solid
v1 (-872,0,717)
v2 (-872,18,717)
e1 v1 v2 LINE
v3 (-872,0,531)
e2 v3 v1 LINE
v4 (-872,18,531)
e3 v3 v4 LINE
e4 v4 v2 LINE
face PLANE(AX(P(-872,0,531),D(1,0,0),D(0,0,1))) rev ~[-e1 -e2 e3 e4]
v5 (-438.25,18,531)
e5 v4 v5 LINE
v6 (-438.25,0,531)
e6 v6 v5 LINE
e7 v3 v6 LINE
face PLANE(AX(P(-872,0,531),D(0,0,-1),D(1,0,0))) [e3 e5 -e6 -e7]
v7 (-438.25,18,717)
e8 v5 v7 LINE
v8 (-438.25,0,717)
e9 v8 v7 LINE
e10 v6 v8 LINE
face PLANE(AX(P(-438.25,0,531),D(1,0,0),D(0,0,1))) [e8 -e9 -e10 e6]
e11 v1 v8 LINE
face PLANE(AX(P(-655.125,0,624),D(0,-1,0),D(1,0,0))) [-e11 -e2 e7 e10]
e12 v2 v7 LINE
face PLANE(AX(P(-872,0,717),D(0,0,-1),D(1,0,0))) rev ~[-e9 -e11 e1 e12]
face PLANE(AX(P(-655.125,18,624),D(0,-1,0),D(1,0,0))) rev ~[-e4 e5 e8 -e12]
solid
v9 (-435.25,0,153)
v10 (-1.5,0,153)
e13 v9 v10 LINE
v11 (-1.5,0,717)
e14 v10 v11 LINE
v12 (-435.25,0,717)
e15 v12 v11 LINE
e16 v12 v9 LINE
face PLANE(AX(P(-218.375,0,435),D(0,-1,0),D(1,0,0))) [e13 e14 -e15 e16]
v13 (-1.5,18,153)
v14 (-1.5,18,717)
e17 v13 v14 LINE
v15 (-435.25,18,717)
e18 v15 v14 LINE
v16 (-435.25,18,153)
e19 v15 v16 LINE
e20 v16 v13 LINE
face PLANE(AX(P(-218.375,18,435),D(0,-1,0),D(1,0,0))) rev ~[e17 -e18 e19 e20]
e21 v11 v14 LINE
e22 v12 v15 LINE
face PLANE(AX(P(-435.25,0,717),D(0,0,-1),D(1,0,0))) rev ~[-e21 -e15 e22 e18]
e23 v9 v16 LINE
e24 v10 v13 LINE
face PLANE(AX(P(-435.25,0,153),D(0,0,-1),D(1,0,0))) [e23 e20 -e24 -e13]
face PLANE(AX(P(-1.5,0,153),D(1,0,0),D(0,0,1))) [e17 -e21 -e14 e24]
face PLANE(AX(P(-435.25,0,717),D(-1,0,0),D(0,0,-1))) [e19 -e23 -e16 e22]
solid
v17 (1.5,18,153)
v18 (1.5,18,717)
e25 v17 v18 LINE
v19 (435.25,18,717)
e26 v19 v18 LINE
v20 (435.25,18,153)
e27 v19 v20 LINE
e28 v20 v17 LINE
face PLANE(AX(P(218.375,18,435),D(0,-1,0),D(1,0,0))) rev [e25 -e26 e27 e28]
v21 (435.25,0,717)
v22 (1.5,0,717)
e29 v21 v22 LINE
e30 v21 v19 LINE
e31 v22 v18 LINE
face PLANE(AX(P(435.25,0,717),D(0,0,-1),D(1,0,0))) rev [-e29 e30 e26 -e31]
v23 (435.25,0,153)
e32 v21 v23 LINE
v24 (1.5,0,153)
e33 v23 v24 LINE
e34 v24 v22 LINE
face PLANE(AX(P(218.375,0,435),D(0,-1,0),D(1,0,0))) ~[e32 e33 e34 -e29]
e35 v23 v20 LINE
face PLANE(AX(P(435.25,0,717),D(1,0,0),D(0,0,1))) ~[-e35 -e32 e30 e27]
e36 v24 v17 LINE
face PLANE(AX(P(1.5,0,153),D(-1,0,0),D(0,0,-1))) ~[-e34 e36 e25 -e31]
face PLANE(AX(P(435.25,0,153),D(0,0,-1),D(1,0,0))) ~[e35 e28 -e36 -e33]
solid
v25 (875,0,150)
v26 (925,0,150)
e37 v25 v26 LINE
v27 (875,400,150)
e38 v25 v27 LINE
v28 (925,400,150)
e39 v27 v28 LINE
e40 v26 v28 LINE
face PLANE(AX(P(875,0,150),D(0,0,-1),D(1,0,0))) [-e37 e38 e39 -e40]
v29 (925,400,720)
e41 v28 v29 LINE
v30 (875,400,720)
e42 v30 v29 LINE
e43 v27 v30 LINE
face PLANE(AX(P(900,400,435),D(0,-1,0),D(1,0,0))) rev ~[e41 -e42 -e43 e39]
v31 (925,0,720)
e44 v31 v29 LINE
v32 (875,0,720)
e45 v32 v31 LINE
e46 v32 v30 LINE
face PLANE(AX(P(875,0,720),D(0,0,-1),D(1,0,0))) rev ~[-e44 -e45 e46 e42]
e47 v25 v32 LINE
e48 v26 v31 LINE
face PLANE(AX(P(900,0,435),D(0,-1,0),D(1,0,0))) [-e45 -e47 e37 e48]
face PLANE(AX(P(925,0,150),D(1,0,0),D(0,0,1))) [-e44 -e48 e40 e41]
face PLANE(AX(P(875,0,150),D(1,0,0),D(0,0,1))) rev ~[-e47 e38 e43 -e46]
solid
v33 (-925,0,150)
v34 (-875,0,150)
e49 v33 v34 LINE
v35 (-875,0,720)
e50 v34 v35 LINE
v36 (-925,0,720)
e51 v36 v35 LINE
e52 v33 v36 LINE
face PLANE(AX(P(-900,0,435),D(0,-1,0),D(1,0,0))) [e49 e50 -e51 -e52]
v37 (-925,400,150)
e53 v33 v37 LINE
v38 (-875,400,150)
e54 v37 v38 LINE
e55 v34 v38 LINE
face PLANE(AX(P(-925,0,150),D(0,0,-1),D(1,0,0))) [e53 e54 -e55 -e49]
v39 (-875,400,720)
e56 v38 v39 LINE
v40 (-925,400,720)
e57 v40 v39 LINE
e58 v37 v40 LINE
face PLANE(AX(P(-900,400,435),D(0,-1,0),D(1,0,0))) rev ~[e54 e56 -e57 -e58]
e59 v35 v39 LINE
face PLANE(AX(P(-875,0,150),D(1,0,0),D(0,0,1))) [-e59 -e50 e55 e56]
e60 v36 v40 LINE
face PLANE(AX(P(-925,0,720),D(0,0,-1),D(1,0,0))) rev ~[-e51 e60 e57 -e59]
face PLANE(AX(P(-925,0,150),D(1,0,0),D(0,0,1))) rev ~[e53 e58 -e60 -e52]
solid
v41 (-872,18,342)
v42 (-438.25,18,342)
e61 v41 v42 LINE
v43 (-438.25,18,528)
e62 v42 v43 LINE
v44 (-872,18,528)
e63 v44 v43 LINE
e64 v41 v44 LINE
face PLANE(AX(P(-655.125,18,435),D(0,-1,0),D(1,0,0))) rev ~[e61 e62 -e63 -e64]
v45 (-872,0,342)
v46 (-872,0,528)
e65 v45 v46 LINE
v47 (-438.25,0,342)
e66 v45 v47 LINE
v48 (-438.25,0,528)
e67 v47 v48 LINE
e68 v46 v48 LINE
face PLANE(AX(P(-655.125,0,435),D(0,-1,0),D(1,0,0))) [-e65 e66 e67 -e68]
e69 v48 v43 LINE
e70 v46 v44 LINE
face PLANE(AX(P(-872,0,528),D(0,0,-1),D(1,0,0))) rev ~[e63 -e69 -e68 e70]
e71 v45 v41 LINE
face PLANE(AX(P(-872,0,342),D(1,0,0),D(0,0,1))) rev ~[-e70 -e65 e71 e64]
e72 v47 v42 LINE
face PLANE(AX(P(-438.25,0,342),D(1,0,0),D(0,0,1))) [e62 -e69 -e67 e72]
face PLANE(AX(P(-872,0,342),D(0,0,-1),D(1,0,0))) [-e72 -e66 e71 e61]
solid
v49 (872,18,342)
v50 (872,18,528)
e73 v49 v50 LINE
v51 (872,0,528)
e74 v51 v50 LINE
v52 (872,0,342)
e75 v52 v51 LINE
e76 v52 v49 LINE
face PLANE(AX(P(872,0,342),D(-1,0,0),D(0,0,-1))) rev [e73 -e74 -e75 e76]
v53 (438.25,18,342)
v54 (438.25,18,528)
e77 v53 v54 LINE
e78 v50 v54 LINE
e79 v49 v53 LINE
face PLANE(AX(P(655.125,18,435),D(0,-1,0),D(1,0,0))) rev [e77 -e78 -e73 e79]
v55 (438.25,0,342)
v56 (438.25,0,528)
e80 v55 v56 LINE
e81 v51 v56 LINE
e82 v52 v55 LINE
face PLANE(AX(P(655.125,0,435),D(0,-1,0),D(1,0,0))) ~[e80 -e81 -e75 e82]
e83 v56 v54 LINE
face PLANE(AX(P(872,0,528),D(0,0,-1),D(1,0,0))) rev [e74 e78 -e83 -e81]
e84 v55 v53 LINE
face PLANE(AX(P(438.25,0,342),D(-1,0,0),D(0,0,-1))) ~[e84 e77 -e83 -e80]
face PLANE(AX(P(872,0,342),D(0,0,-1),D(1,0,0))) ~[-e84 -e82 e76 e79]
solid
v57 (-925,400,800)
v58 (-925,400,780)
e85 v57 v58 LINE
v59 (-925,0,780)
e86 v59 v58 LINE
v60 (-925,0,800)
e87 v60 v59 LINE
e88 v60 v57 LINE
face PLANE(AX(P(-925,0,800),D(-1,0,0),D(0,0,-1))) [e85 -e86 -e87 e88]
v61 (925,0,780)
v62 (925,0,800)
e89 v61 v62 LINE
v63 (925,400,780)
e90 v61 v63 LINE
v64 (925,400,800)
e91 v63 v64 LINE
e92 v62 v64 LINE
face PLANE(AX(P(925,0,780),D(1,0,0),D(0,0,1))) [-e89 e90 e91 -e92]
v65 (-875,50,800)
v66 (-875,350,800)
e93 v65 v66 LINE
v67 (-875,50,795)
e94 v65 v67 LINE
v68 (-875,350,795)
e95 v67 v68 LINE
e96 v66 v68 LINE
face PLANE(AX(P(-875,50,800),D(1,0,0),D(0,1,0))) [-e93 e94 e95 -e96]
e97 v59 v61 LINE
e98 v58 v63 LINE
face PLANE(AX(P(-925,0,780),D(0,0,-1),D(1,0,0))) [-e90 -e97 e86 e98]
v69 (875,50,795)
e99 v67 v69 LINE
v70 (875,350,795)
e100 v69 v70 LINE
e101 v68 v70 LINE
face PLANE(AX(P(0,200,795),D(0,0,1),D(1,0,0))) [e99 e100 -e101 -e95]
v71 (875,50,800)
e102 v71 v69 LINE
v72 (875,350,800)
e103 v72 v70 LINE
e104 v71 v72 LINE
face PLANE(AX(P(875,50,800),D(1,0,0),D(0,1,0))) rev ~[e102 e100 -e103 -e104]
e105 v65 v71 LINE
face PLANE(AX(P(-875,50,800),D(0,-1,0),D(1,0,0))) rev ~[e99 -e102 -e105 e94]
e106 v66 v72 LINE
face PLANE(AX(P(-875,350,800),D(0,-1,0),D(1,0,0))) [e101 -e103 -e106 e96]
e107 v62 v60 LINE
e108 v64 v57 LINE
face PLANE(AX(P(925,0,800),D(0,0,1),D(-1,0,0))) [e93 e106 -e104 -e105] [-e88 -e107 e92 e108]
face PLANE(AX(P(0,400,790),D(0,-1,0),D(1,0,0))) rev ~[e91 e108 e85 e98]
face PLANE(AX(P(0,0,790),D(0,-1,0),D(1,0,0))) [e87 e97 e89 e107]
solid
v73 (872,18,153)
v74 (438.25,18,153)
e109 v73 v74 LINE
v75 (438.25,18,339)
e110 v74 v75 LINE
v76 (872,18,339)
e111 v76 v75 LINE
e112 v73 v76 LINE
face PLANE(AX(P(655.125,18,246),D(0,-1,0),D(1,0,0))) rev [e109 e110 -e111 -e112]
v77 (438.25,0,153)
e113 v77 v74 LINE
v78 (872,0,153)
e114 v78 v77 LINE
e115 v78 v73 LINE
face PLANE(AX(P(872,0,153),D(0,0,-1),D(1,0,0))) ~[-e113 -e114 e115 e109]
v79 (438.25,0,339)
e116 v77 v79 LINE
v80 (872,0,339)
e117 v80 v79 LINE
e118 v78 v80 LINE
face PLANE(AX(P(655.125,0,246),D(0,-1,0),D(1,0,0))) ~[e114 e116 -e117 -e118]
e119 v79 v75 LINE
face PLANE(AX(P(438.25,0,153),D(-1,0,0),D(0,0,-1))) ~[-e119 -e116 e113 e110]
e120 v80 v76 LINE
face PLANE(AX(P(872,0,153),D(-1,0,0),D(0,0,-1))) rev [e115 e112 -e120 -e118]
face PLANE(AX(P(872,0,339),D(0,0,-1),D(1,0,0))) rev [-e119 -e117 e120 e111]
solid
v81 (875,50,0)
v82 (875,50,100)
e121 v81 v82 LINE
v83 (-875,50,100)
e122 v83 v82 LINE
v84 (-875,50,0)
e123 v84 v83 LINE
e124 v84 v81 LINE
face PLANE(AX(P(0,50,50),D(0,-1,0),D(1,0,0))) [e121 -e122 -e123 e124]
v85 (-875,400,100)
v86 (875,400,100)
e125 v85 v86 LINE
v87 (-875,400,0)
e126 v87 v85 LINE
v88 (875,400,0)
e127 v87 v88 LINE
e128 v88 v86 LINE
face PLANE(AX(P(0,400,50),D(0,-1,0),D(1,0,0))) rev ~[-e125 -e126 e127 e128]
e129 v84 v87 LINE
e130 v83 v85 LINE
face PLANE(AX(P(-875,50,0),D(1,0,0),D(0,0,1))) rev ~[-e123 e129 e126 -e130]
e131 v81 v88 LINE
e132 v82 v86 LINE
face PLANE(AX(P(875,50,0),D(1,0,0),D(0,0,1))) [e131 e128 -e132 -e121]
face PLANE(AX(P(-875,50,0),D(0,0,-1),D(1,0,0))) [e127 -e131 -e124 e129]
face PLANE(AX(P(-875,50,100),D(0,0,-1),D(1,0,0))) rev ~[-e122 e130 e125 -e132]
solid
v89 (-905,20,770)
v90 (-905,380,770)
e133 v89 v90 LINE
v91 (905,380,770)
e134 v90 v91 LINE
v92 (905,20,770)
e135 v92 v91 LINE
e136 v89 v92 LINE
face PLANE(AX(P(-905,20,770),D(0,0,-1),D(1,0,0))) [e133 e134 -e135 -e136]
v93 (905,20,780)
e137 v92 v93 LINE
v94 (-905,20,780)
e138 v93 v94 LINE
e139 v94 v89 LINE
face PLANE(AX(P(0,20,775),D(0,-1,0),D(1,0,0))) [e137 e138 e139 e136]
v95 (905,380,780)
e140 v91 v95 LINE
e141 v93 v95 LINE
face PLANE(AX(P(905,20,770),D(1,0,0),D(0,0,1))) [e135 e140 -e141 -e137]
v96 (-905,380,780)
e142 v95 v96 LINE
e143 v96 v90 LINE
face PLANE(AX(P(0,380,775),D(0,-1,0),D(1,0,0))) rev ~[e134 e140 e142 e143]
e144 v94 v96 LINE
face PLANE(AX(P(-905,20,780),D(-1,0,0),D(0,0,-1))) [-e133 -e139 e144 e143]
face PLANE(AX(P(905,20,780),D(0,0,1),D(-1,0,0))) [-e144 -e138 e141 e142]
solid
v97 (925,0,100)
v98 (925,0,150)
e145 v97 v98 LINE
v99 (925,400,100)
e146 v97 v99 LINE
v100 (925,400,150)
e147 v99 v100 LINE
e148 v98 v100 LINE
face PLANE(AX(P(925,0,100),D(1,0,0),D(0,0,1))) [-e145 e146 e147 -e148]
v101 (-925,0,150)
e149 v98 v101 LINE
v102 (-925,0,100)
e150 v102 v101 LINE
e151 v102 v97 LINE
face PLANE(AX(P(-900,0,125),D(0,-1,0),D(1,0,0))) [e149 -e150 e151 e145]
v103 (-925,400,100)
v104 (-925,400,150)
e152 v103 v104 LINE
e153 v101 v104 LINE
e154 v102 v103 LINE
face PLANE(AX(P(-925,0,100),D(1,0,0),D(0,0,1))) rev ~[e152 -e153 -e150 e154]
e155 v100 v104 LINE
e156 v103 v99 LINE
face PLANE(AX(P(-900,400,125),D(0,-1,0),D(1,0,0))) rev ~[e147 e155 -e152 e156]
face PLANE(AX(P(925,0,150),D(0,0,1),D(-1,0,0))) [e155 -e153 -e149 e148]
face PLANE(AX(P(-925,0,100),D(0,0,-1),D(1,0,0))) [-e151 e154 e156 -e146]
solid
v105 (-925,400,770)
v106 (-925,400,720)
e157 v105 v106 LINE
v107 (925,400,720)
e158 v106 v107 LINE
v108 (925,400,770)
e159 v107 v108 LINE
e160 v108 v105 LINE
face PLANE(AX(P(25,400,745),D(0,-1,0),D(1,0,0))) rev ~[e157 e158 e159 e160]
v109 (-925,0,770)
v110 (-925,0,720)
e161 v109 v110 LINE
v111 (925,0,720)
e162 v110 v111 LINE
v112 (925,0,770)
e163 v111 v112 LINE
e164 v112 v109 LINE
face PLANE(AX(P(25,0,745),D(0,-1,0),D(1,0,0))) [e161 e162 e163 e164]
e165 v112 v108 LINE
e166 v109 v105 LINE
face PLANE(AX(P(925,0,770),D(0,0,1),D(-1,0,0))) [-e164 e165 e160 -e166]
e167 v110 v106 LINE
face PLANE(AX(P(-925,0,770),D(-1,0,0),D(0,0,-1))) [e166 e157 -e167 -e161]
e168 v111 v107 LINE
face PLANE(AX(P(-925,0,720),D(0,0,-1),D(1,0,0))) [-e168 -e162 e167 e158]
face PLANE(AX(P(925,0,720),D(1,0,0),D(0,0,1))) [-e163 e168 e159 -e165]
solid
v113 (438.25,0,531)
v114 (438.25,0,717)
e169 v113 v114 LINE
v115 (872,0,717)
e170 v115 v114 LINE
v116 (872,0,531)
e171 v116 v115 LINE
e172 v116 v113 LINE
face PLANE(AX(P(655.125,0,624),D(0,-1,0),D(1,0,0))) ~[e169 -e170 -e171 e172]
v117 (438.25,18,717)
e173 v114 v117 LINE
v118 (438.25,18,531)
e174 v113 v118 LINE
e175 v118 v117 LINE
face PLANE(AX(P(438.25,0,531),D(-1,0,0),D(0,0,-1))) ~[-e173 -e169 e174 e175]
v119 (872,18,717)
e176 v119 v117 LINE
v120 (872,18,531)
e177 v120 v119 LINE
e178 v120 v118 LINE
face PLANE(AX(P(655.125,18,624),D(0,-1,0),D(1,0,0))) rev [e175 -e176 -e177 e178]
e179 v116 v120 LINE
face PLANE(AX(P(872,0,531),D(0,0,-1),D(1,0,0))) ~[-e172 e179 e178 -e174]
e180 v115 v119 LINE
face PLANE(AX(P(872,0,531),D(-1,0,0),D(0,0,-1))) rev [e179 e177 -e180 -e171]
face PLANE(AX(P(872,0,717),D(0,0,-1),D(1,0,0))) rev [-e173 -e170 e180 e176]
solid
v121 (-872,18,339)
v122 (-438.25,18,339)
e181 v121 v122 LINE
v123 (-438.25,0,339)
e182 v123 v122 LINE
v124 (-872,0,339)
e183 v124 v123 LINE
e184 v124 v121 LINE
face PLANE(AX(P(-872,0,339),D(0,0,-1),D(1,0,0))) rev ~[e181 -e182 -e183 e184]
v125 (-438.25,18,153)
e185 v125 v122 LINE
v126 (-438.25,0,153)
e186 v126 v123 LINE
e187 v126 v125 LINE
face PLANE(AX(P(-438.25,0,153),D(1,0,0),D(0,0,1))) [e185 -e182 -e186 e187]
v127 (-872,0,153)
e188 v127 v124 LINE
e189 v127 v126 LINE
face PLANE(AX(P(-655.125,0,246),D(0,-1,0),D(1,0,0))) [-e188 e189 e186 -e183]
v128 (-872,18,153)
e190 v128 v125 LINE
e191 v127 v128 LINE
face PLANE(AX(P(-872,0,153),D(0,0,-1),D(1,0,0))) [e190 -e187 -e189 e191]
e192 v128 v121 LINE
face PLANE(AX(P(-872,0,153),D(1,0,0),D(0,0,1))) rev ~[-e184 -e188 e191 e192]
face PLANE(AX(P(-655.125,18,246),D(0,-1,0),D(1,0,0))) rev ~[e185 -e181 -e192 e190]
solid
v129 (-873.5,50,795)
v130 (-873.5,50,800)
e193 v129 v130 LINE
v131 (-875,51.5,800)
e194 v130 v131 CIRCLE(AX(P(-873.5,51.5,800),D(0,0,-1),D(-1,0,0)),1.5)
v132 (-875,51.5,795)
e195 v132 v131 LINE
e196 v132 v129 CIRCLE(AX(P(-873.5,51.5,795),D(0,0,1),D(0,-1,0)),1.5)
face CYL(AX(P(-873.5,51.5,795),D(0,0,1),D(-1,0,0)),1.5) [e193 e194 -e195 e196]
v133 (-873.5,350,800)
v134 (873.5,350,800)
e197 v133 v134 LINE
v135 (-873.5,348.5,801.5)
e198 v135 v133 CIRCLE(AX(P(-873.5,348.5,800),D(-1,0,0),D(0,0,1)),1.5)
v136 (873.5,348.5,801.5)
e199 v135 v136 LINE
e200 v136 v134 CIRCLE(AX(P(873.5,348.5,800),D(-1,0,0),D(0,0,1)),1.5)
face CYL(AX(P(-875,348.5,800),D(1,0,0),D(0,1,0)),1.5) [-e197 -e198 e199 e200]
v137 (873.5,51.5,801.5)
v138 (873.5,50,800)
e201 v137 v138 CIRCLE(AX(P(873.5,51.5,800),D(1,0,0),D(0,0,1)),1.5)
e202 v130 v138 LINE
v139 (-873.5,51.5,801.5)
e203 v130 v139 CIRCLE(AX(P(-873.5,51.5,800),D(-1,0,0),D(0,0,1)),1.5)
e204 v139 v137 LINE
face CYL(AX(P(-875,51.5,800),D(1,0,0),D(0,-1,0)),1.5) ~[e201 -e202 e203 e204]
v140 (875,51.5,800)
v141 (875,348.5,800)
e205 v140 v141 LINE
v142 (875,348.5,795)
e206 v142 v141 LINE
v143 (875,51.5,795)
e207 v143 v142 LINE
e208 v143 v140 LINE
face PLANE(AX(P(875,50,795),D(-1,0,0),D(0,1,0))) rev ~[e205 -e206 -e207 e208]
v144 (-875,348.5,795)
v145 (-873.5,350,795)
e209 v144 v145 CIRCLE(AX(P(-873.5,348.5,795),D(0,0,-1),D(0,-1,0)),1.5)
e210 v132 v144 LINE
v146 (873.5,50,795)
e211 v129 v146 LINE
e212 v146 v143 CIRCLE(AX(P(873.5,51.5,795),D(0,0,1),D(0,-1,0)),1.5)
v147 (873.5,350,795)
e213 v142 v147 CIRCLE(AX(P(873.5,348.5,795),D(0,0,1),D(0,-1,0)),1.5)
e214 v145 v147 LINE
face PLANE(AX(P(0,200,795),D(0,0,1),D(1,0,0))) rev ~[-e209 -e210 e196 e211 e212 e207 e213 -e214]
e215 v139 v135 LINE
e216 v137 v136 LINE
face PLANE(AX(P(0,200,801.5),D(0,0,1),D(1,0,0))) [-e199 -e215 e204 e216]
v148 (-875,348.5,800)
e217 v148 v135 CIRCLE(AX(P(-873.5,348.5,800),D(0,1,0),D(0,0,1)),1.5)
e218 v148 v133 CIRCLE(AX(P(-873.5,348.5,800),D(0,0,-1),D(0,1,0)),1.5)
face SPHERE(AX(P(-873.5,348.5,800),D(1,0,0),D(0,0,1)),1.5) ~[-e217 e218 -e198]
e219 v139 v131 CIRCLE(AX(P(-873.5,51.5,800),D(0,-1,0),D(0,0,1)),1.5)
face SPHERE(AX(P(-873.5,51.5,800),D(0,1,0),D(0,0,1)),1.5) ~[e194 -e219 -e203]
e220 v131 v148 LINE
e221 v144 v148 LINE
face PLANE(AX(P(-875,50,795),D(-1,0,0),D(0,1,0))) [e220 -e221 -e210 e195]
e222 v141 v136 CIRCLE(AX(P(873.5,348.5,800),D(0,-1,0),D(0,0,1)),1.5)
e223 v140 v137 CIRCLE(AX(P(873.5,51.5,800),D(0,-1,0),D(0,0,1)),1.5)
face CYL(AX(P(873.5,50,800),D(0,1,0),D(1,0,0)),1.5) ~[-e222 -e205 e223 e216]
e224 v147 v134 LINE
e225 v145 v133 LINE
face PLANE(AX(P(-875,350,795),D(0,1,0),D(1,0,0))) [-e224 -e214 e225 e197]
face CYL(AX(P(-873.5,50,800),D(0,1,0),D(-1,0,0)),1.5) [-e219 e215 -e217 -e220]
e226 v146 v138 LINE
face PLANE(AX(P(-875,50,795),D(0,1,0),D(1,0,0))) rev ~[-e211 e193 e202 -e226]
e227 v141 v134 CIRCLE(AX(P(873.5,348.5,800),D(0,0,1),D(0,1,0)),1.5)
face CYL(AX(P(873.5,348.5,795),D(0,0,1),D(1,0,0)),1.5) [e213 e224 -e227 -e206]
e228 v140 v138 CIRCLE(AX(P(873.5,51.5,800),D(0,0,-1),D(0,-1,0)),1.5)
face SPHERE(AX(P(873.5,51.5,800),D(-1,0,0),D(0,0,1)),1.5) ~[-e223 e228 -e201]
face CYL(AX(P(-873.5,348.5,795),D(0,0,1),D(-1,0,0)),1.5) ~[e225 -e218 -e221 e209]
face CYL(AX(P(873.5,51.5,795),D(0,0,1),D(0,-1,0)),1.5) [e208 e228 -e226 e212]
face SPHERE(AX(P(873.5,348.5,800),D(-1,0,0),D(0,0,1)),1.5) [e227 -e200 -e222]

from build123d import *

# Parameters (mm, degrees)
F1_DEPTH  = 400
F0_W      = 50
F0_H      = 50
F0_W_2    = 1750
F0_H_2    = 570
F2_DEPTH  = 400
F3_START  = -50
F0_H_3    = 100
F3_DEPTH  = 350
F0_W_3    = 433.75
F0_H_4    = 186
F4_DEPTH  = 18
F0_H_5    = 3
F5_START  = -20
F5_DEPTH  = 360
F6_DEPTH  = 400
F9_W      = 1750
F9_H      = 300
F10_DEPTH = 5
F11_DEPTH = 6.5
F12_R     = 1.5


# Not quite as in the source:
# - a feature names something its author has since deleted; it is built from what else it names


with BuildPart() as f1:
    # F0 (on Front) → F1 (new body)
    with BuildSketch(Plane.XZ):
        Polygon((905, 770), (-875, 770), (-875, 720), (-872, 720), (875, 720), (925, 720), (925, 770), align=None)
        Polygon((-905, 770), (-925, 770), (-925, 720), (-875, 720), (-875, 770), align=None)
    extrude(amount=-F1_DEPTH)


with BuildPart() as f1b:
    # F0 (on Front) → F1, piece 2 (new body)
    with BuildSketch(Plane.XZ):
        with Locations((-900, 125)):
            Rectangle(F0_W, F0_H)
        with Locations((0, 125)):
            Rectangle(F0_W_2, F0_H)
        with Locations((900, 125)):
            Rectangle(F0_W, F0_H)
    extrude(amount=-F1_DEPTH)


with BuildPart() as f2:
    # F0 (on Front) → F2 (new body)
    with BuildSketch(Plane.XZ):
        with Locations((-900, 435)):
            Rectangle(F0_W, F0_H_2)
    extrude(amount=-F2_DEPTH)


with BuildPart() as f2b:
    # F0 (on Front) → F2, piece 2 (new body)
    with BuildSketch(Plane.XZ):
        with Locations((900, 435)):
            Rectangle(F0_W, F0_H_2)
    extrude(amount=-F2_DEPTH)


with BuildPart() as f3:
    # F0 (on Front) → F3 (new body)
    with BuildSketch(Plane.XZ.offset(F3_START)):
        with Locations((0, 50)):
            Rectangle(F0_W_2, F0_H_3)
    extrude(amount=-F3_DEPTH)


with BuildPart() as f4:
    # F0 (on Front) → F4 (new body)
    with BuildSketch(Plane.XZ):
        with Locations((-655.125, 435)):
            Rectangle(F0_W_3, F0_H_4)
    extrude(amount=-F4_DEPTH)


with BuildPart() as f4b:
    # F0 (on Front) → F4, piece 2 (new body)
    with BuildSketch(Plane.XZ):
        with Locations((-655.125, 246)):
            Rectangle(F0_W_3, F0_H_4)
    extrude(amount=-F4_DEPTH)


with BuildPart() as f4c:
    # F0 (on Front) → F4, piece 3 (new body)
    with BuildSketch(Plane.XZ):
        with Locations((-218.375, 435)):
            Rectangle(F0_W_3, F0_H_4)
        with Locations((-218.375, 246)):
            Rectangle(F0_W_3, F0_H_4)
        with Locations((-218.375, 340.5)):
            Rectangle(F0_W_3, F0_H_5)
        with Locations((-218.375, 624)):
            Rectangle(F0_W_3, F0_H_4)
        with Locations((-218.375, 529.5)):
            Rectangle(F0_W_3, F0_H_5)
    extrude(amount=-F4_DEPTH)


with BuildPart() as f4d:
    # F0 (on Front) → F4, piece 4 (new body)
    with BuildSketch(Plane.XZ):
        with Locations((-655.125, 624)):
            Rectangle(F0_W_3, F0_H_4)
    extrude(amount=-F4_DEPTH)


with BuildPart() as f5:
    # F0 (on Front) → F5 (new body)
    with BuildSketch(Plane.XZ.offset(F5_START)):
        Polygon((-905, 780), (-905, 770), (-875, 770), (905, 770), (905, 780), align=None)
    extrude(amount=-F5_DEPTH)


with BuildPart() as f6:
    # F0 (on Front) → F6 (new body)
    with BuildSketch(Plane.XZ):
        Polygon((-925, 780), (-905, 780), (905, 780), (925, 780), (925, 800), (-925, 800), align=None)
    extrude(amount=-F6_DEPTH)

    # F9 (on face) → F10 (cut)
    with BuildSketch(Plane.XY.offset(800)):
        with Locations((0, 200)):
            Rectangle(F9_W, F9_H)
    extrude(amount=-F10_DEPTH, mode=Mode.SUBTRACT)


with BuildPart() as f8_1:
    # F8: instance of F4d
    add(f4d.part.mirror(Plane(origin=(0, 9, 435), x_dir=(0, 1, 0), z_dir=(1, 0, 0))))


with BuildPart() as f8_2:
    # F8: instance of F4
    add(f4.part.mirror(Plane(origin=(0, 9, 435), x_dir=(0, 1, 0), z_dir=(1, 0, 0))))


with BuildPart() as f8_3:
    # F8: instance of F4b
    add(f4b.part.mirror(Plane(origin=(0, 9, 435), x_dir=(0, 1, 0), z_dir=(1, 0, 0))))


with BuildPart() as f8_4:
    # F8: instance of F4c
    add(f4c.part.mirror(Plane(origin=(0, 9, 435), x_dir=(0, 1, 0), z_dir=(1, 0, 0))))


with BuildPart() as f11:
    # F11 (new): a face of the model
    f11_faces = [f6.part.faces().sort_by_distance(p)[0] for p in [
        (0, 200, 795),
    ]]
    extrude(f11_faces, amount=F11_DEPTH)

    # F12
    f12_edges = [f11.edges().sort_by_distance(p)[0] for p in [
        (0, 350, 801.5),
        (-875, 200, 801.5),
        (0, 50, 801.5),
        (875, 200, 801.5),
        (-875, 50, 798.25),
        (-875, 350, 798.25),
        (875, 350, 798.25),
        (875, 50, 798.25),
    ]]
    fillet(f12_edges, radius=F12_R)


solid = Compound([f1.part, f1b.part, f2.part, f2b.part, f3.part, f4.part, f4b.part, f4c.part, f4d.part, f5.part, f6.part, f8_1.part, f8_2.part, f8_3.part, f8_4.part, f11.part])
